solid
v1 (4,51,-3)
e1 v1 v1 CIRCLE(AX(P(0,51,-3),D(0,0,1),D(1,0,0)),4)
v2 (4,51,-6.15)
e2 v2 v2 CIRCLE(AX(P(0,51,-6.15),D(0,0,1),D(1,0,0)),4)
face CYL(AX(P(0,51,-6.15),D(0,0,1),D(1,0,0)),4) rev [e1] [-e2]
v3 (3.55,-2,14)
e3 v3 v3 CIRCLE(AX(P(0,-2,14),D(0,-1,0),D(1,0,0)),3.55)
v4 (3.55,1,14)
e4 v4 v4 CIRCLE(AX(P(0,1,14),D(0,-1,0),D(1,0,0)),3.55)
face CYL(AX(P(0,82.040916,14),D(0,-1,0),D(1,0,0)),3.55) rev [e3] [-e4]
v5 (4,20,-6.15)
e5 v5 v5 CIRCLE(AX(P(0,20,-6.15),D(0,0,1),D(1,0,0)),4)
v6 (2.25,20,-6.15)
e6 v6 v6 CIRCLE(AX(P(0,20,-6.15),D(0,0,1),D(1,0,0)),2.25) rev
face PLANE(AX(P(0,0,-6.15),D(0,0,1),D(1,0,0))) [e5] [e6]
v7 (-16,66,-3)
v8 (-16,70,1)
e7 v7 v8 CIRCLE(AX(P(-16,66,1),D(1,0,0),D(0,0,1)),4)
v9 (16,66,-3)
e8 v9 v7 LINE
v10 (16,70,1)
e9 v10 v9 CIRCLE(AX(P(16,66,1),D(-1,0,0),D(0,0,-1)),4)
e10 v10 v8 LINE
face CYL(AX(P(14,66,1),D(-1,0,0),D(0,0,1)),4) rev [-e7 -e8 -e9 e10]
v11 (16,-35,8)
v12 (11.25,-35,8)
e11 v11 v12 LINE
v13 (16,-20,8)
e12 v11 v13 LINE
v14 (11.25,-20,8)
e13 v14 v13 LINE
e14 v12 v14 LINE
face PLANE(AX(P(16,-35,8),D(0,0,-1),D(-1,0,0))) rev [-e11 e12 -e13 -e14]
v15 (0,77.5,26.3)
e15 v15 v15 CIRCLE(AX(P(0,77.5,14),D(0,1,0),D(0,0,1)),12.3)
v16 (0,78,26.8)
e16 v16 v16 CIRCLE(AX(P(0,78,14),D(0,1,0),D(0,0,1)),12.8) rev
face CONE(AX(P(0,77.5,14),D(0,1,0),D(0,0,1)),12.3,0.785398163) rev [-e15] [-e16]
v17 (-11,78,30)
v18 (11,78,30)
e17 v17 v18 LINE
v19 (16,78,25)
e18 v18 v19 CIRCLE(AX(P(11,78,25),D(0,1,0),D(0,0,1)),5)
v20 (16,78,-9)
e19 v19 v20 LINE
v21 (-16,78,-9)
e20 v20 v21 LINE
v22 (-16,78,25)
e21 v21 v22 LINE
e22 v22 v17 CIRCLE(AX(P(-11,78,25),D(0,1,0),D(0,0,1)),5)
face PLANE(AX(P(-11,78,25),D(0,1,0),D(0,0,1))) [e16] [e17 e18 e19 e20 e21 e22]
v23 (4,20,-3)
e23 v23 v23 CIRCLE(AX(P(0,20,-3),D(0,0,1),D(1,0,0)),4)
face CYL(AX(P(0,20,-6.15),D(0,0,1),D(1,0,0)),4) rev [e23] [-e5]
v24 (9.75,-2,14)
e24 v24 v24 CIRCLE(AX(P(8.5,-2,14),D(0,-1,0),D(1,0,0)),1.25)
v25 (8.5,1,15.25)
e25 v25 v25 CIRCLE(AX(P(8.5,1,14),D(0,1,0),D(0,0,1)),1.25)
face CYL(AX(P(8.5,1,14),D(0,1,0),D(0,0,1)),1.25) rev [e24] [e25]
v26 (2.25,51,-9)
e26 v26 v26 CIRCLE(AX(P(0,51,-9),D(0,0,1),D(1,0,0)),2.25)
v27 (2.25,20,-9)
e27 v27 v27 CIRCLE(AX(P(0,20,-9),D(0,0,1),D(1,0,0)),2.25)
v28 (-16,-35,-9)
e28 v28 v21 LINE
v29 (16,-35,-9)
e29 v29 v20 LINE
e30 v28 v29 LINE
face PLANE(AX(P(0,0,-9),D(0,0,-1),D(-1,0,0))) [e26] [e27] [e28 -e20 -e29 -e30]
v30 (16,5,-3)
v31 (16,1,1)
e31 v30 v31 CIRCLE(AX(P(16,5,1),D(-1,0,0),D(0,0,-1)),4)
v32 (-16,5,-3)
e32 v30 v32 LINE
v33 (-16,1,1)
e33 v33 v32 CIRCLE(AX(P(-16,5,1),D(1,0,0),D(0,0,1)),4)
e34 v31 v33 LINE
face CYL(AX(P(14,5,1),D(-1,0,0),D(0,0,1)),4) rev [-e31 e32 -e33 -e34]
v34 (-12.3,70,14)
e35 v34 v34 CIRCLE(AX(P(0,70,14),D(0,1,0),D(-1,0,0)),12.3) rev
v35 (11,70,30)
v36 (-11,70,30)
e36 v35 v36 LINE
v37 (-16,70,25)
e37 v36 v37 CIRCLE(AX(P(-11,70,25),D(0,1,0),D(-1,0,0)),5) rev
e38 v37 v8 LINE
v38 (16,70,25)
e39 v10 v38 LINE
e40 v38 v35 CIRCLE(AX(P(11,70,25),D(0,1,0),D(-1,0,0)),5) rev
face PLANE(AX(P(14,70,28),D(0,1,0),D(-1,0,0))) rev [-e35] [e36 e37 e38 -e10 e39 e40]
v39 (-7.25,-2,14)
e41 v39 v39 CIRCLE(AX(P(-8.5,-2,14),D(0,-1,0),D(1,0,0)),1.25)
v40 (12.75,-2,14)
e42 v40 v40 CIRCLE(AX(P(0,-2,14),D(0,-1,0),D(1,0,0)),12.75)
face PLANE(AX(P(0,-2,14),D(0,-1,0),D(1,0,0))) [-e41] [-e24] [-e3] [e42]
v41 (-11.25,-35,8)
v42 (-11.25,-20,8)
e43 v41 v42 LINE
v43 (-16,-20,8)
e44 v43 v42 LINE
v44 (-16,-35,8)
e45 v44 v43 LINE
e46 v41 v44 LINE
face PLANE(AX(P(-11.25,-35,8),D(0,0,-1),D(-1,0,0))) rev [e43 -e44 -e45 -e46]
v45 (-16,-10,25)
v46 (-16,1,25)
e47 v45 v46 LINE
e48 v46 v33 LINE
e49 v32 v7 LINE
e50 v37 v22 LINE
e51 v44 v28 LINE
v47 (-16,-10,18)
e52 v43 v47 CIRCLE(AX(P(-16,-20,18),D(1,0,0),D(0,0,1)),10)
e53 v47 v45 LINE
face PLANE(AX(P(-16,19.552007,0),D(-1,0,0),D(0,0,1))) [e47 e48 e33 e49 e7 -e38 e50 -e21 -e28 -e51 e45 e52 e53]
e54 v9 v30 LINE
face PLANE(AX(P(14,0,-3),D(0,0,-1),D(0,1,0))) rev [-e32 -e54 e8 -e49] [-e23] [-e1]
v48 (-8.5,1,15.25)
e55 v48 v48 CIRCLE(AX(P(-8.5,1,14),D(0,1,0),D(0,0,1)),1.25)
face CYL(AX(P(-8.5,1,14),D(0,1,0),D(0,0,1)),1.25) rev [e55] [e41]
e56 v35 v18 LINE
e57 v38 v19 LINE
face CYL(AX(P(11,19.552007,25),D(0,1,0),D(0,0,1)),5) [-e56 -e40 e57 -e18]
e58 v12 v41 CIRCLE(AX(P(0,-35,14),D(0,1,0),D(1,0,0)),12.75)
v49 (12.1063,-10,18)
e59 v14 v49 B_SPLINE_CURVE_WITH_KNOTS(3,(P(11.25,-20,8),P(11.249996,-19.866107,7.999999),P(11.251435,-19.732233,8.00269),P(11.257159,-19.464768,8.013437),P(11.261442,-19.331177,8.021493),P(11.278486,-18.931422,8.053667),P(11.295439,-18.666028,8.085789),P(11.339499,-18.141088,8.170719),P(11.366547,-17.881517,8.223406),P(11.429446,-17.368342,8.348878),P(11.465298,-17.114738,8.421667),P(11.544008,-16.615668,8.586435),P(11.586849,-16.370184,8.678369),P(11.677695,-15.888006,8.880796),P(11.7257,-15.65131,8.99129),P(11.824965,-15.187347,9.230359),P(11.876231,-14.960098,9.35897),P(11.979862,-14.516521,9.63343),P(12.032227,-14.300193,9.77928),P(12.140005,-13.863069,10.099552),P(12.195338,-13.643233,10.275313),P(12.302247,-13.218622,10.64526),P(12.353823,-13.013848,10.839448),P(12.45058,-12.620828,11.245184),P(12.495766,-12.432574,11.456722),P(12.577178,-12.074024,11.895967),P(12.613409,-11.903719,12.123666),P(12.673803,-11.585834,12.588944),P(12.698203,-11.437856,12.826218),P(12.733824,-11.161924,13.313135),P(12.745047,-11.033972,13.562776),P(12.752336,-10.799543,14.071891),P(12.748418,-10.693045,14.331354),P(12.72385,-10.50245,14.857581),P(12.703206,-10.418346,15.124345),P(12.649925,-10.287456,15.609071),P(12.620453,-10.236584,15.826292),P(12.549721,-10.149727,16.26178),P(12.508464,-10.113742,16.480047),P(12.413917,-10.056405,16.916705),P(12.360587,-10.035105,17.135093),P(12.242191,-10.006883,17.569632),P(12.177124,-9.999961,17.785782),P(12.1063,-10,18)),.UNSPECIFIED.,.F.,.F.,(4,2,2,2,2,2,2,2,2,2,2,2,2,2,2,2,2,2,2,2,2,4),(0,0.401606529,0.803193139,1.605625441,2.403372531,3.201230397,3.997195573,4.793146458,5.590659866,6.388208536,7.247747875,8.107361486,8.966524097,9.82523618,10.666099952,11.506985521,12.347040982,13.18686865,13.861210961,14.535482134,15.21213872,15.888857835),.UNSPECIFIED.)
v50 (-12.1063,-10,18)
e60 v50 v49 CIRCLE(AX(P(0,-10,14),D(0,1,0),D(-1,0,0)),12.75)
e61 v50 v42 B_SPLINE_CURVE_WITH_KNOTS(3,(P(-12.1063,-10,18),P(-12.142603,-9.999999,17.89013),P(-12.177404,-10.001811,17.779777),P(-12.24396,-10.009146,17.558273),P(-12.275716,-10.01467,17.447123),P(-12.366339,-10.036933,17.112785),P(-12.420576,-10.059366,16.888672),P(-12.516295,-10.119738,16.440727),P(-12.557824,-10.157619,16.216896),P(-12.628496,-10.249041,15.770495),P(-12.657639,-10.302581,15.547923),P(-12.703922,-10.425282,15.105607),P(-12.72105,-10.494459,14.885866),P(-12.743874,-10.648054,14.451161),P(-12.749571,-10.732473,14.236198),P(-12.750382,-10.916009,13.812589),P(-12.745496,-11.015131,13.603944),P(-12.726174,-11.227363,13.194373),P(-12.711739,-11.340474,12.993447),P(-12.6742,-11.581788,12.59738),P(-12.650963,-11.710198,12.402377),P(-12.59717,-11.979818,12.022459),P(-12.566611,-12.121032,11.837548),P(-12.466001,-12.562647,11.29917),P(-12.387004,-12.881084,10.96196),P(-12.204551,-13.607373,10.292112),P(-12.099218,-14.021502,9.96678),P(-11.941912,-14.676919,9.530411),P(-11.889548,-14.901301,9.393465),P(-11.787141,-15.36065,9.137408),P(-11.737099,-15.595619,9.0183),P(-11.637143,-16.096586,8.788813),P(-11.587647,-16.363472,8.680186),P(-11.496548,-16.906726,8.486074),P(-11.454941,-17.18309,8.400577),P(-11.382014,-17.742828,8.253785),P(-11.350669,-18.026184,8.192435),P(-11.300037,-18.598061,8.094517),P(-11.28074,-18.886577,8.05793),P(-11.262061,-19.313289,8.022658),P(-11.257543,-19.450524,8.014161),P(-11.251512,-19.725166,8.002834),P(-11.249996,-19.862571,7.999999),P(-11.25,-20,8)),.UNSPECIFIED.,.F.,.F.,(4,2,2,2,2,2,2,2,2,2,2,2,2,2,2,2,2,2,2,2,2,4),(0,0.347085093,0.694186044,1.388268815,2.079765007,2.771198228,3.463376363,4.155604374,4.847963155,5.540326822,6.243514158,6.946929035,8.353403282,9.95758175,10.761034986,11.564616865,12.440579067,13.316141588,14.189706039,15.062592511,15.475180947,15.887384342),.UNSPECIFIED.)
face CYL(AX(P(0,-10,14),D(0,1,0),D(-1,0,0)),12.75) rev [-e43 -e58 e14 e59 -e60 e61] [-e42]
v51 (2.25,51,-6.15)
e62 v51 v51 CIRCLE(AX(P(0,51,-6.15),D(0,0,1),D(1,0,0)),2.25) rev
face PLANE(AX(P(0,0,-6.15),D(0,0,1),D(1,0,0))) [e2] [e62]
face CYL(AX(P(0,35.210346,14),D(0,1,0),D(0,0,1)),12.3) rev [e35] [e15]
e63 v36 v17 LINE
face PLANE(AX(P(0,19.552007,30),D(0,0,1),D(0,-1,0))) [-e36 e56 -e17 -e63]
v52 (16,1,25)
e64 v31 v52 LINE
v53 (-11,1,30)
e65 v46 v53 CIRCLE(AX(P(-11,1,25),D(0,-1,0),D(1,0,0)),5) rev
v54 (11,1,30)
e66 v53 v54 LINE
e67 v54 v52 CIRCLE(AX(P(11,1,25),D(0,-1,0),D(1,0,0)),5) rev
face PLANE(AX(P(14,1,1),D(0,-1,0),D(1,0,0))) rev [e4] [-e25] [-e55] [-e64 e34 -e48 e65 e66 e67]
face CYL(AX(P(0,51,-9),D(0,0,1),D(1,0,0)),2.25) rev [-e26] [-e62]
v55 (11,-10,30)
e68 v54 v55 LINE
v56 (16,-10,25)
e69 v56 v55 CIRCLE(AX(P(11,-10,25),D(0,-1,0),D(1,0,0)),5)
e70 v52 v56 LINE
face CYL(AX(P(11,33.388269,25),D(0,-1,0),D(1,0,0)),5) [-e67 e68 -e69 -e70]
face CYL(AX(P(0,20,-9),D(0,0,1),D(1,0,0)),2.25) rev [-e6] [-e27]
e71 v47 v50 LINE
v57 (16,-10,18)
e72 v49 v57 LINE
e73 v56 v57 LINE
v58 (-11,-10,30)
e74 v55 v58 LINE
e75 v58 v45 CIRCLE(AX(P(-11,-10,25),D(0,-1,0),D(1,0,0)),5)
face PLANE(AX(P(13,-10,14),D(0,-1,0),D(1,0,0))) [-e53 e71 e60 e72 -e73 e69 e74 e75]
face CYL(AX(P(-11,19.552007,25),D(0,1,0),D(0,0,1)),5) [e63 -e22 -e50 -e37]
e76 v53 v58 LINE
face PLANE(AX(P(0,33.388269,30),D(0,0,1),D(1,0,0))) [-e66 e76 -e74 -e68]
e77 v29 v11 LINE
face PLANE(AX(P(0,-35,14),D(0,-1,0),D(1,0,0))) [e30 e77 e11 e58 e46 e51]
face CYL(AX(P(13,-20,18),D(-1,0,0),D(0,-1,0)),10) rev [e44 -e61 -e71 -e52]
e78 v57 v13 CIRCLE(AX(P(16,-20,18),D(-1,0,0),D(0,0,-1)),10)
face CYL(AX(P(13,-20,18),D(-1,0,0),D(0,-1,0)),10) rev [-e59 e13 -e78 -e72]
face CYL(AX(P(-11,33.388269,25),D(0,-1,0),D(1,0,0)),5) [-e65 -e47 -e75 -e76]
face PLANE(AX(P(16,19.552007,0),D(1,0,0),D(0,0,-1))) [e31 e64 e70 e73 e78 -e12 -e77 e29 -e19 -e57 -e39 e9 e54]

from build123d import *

# Parameters (mm, degrees)
CROQUIS1_W                          = 31
CROQUIS1_H                          = 72
SALIENTE_EXTRUIR1_DEPTH             = 28
CROQUIS2_W                          = 27
CROQUIS2_H                          = 69
CORTAR_EXTRUIR1_DEPTH               = 83.170554337
CROQUIS5_W                          = 13
CROQUIS5_H                          = 10
DI_METRO_DE_TALADRO_2_5_2_5_2_D     = 2.5
DI_METRO_DE_TALADRO_2_5_2_5_2_DEPTH = 11
REDONDEO3_R                         = 5
REDONDEO4_R                         = 3
SALIENTE_EXTRUIR2_START             = 10
CROQUIS14_R                         = 13
SALIENTE_EXTRUIR2_DEPTH             = 10
CROQUIS15_W                         = 28
CROQUIS15_H                         = 82
SALIENTE_EXTRUIR3_DEPTH             = 6
CORTAR_EXTRUIR2_REACH               = 80.511
CROQUIS16_R                         = 3.55
CROQUIS17_R                         = 3.55
SALIENTE_EXTRUIR4_DEPTH             = 6
CORTAR_EXTRUIR3_DEPTH               = 88.475710915
SALIENTE_EXTRUIR5_START             = 10
SALIENTE_EXTRUIR5_DEPTH             = 10
REDONDEO5_R                         = 10
CROQUIS20_R                         = 2.25
CORTAR_EXTRUIR4_DEPTH               = 86.094065614
CROQUIS21_R                         = 4
CROQUIS21_R_2                       = 2.25
CORTAR_EXTRUIR5_DEPTH               = 3.15
SALIENTE_EXTRUIR6_START             = 2
CROQUIS22_R                         = 12.75
CROQUIS22_R_2                       = 1.25
CROQUIS22_R_3                       = 3.55
SALIENTE_EXTRUIR6_DEPTH             = 2
SALIENTE_EXTRUIR7_START             = -8
SALIENTE_EXTRUIR7_DEPTH             = 8
SALIENTE_EXTRUIR8_DEPTH             = 2
SALIENTE_EXTRUIR9_START             = 2
SALIENTE_EXTRUIR9_DEPTH             = 2
SALIENTE_EXTRUIR10_DEPTH            = 11
CROQUIS27_R                         = 12.3
CORTAR_EXTRUIR6_DEPTH               = 8
SALIENTE_EXTRUIR11_START            = 15
SALIENTE_EXTRUIR11_DEPTH            = 15
CHAFL_N1_SIZE                       = 0.5


with BuildPart() as part:
    # Croquis1 → Saliente-Extruir1 (new body)
    with BuildSketch(Plane(origin=(14, 0, 0), x_dir=(0, 0, -1), z_dir=(1, 0, 0))):
        with Locations((-12.5, 36)):
            Rectangle(CROQUIS1_W, CROQUIS1_H)
    extrude(amount=-SALIENTE_EXTRUIR1_DEPTH)

    # Croquis2 → Cortar-Extruir1 (cut, through all)
    with BuildSketch(Plane.ZY.offset(14)):
        with Locations((14.5, 35.5)):
            Rectangle(CROQUIS2_W, CROQUIS2_H)
    extrude(amount=-CORTAR_EXTRUIR1_DEPTH, mode=Mode.SUBTRACT)

    # Croquis5 → Revolución3 (revolve)
    with BuildSketch(Plane(origin=(0, 0, 14), x_dir=(-1, 0, 0), z_dir=(0, 0, -1)), mode=Mode.PRIVATE) as revoluci_n3_sk:
        with Locations((-6.5, -5)):
            Rectangle(CROQUIS5_W, CROQUIS5_H)
    revolve(revoluci_n3_sk.sketch.rotate(Axis((0, -10, 14), (0, 1, 0)), 180), axis=Axis((0, -10, 14), (0, 1, 0)))

    # Croquis6 → Cortar-Revolución1 (revolve, cut)
    with BuildSketch(Plane(origin=(0, 0, 14), x_dir=(-1, 0, 0), z_dir=(0, 0, -1)), mode=Mode.PRIVATE) as cortar_revoluci_n1_sk:
        Polygon((-12.75, -10), (0, -10), (0, 2), (-2.3, 2), (-2.3, 1), (-2.25, 1), (-2.25, 0), (-12.75, 0), align=None)
    revolve(cortar_revoluci_n1_sk.sketch.rotate(Axis((0, -10, 14), (0, 1, 0)), 180), axis=Axis((0, -10, 14), (0, 1, 0)), mode=Mode.SUBTRACT)

    # Diámetro de taladro Ø2.5 (2.5)2
    with Locations(Plane(origin=(0, 1, 0), x_dir=(1, 0, 0), z_dir=(0, 1, 0))):
        with Locations((8.5, -14), (-8.5, -14)):
            Hole(DI_METRO_DE_TALADRO_2_5_2_5_2_D / 2, depth=DI_METRO_DE_TALADRO_2_5_2_5_2_DEPTH)

    # Redondeo3
    redondeo3_edges = [part.edges().sort_by_distance(p)[0] for p in [
        (0, 1, 1),
        (0, 70, 1),
    ]]
    fillet(redondeo3_edges, radius=REDONDEO3_R)

    # Redondeo4
    redondeo4_edges = [part.edges().sort_by_distance(p)[0] for p in [
        (14, 0.5, 28),
        (-14, 0.5, 28),
        (14, 71, 28),
        (-14, 71, 28),
    ]]
    fillet(redondeo4_edges, radius=REDONDEO4_R)

    # Croquis14 → Saliente-Extruir2 (add)
    with BuildSketch(Plane.XZ.offset(SALIENTE_EXTRUIR2_START)):
        with BuildLine():
            Line((11, 28), (-11, 28))
            ThreePointArc((-11, 28), (-13.121320344, 27.121320344), (-14, 25))
            Line((-14, 25), (-14, -3))
            Line((-14, -3), (14, -3))
            Line((14, -3), (14, 25))
            ThreePointArc((14, 25), (13.121320344, 27.121320344), (11, 28))
        make_face()
        with Locations((0, 14)):
            Circle(CROQUIS14_R, mode=Mode.SUBTRACT)
    extrude(amount=-SALIENTE_EXTRUIR2_DEPTH)

    # Croquis15 → Saliente-Extruir3 (add)
    with BuildSketch(Plane(origin=(0, 0, -3), x_dir=(-1, 0, 0), z_dir=(0, 0, -1))):
        with Locations((0, 31)):
            Rectangle(CROQUIS15_W, CROQUIS15_H)
    extrude(amount=SALIENTE_EXTRUIR3_DEPTH)

    # Cortar-Extruir2: up to this face of the body (flat: up to its plane)
    cortar_extruir2_end = Plane(part.part.faces().sort_by_distance((0, 72, 9.433270582))[0])
    # Croquis16 → Cortar-Extruir2 (cut, up to the picked face)
    with BuildSketch(Plane.XZ, mode=Mode.PRIVATE) as cortar_extruir2_sk1:
        with Locations((0, 14)):
            Circle(CROQUIS16_R)
    cortar_extruir2_tool1 = split(extrude(cortar_extruir2_sk1.sketch, amount=-CORTAR_EXTRUIR2_REACH, mode=Mode.PRIVATE), bisect_by=cortar_extruir2_end, keep=Keep.BOTH, mode=Mode.PRIVATE)
    add(cortar_extruir2_tool1.solids().sort_by(Axis((0, 0, 14), (0, 1, 0)))[0], mode=Mode.SUBTRACT)

    # Croquis17 → Saliente-Extruir4 (add)
    with BuildSketch(Plane(origin=(0, 72, 0), x_dir=(1, 0, 0), z_dir=(0, 1, 0))):
        with BuildLine():
            Line((-11, -28), (11, -28))
            ThreePointArc((11, -28), (13.121320344, -27.121320344), (14, -25))
            Line((14, -25), (14, 9))
            Line((14, 9), (-14, 9))
            Line((-14, 9), (-14, -25))
            ThreePointArc((-14, -25), (-13.121320344, -27.121320344), (-11, -28))
        make_face()
        with Locations((0, -14)):
            Circle(CROQUIS17_R, mode=Mode.SUBTRACT)
    extrude(amount=SALIENTE_EXTRUIR4_DEPTH)

    # Croquis18 → Cortar-Extruir3 (cut, through all)
    with BuildSketch(Plane.ZY.offset(14)):
        with BuildLine():
            Line((6, 70), (1, 70))
            ThreePointArc((1, 70), (-1.828427125, 68.828427125), (-3, 66))
            Line((-3, 66), (-3, 5))
            ThreePointArc((-3, 5), (-1.828427125, 2.171572875), (1, 1))
            Line((1, 1), (6, 1))
            ThreePointArc((6, 1), (2.464466094, 2.464466094), (1, 6))
            Line((1, 6), (1, 65))
            ThreePointArc((1, 65), (2.464466094, 68.535533906), (6, 70))
        make_face()
    extrude(amount=-CORTAR_EXTRUIR3_DEPTH, mode=Mode.SUBTRACT)

    # Croquis19 → Saliente-Extruir5 (add)
    with BuildSketch(Plane.XZ.offset(10).offset(SALIENTE_EXTRUIR5_START)):
        with BuildLine():
            Line((-11.25, 8), (-14, 8))
            Line((-14, 8), (-14, -9))
            Line((-14, -9), (14, -9))
            Line((14, -9), (14, 8))
            Line((14, 8), (11.25, 8))
            ThreePointArc((11.25, 8), (0, 1.25), (-11.25, 8))
        make_face()
    extrude(amount=-SALIENTE_EXTRUIR5_DEPTH)

    # Redondeo5
    # the kernel refuses this fillet: 10 mm, written as the material it adds along each edge
    with BuildSketch(Plane(origin=(14, -10, 8), x_dir=(0, -1, 0), z_dir=(-1, 0, 0))) as redondeo5_piece_1_section:
        with BuildLine():
            CenterArc((REDONDEO5_R, REDONDEO5_R), REDONDEO5_R, 180, 90)
            Line((0, REDONDEO5_R), (0, 0))
            Line((0, 0), (REDONDEO5_R, 0))
        make_face()
    redondeo5_piece_1 = extrude(amount=27.75, mode=Mode.PRIVATE)
    redondeo5_piece_1 = redondeo5_piece_1 - Plane(origin=(0, -12.512239399, 14), x_dir=(-1, 0, 0), z_dir=(0, -1, 0)) * Cylinder(12.75, 96, mode=Mode.PRIVATE)
    add(redondeo5_piece_1)
    with BuildSketch(Plane(origin=(13.75, -10, 8), x_dir=(0, -1, 0), z_dir=(-1, 0, 0))) as redondeo5_piece_2_section:
        with BuildLine():
            CenterArc((REDONDEO5_R, REDONDEO5_R), REDONDEO5_R, 180, 90)
            Line((0, REDONDEO5_R), (0, 0))
            Line((0, 0), (REDONDEO5_R, 0))
        make_face()
    redondeo5_piece_2 = extrude(amount=27.75, mode=Mode.PRIVATE)
    redondeo5_piece_2 = redondeo5_piece_2 - Plane(origin=(0, -12.552647231, 14), x_dir=(-1, 0, 0), z_dir=(0, -1, 0)) * Cylinder(12.75, 96, mode=Mode.PRIVATE)
    add(redondeo5_piece_2)

    # Croquis20 → Cortar-Extruir4 (cut, through all)
    with BuildSketch(Plane.XY.offset(-3)):
        with Locations((0, 51)):
            Circle(CROQUIS20_R)
        with Locations((0, 20)):
            Circle(CROQUIS20_R)
    extrude(amount=-CORTAR_EXTRUIR4_DEPTH, mode=Mode.SUBTRACT)

    # Croquis21 → Cortar-Extruir5 (cut)
    # profile 1 of 2: a face of its own
    with BuildSketch(Plane.XY.offset(-3)):
        with Locations((0, 51)):
            Circle(CROQUIS21_R)
        with Locations((0, 51)):
            Circle(CROQUIS21_R_2, mode=Mode.SUBTRACT)
    # profile 2 of 2: a face of its own
    with BuildSketch(Plane.XY.offset(-3)):
        with Locations((0, 20)):
            Circle(CROQUIS21_R)
        with Locations((0, 20)):
            Circle(CROQUIS21_R_2, mode=Mode.SUBTRACT)
    extrude(amount=-CORTAR_EXTRUIR5_DEPTH, mode=Mode.SUBTRACT)

    # Croquis22 → Saliente-Extruir6 (add)
    with BuildSketch(Plane.XZ.offset(SALIENTE_EXTRUIR6_START)):
        with Locations(Location((0, 14, 0), (0, 0, 161.71611006))):
            Circle(CROQUIS22_R)
        with Locations(Location((8.5, 14, 0), (0, 0, 90))):
            Circle(CROQUIS22_R_2, mode=Mode.SUBTRACT)
        with Locations((0, 14)):
            Circle(CROQUIS22_R_3, mode=Mode.SUBTRACT)
        with Locations(Location((-8.5, 14, 0), (0, 0, 90))):
            Circle(CROQUIS22_R_2, mode=Mode.SUBTRACT)
    extrude(amount=-SALIENTE_EXTRUIR6_DEPTH)

    # Croquis23 → Saliente-Extruir7 (add)
    with BuildSketch(Plane(origin=(0, 78, 0), x_dir=(1, 0, 0), z_dir=(0, 1, 0)).offset(SALIENTE_EXTRUIR7_START)):
        with BuildLine():
            Line((-11, -30), (11, -30))
            ThreePointArc((11, -30), (14.535533906, -28.535533906), (16, -25))
            Line((16, -25), (16, 9))
            Line((16, 9), (14, 9))
            Line((14, 9), (14, -25))
            ThreePointArc((14, -25), (13.121320344, -27.121320344), (11, -28))
            Line((11, -28), (-11, -28))
            ThreePointArc((-11, -28), (-13.121320344, -27.121320344), (-14, -25))
            Line((-14, -25), (-14, 9))
            Line((-14, 9), (-16, 9))
            Line((-16, 9), (-16, -25))
            ThreePointArc((-16, -25), (-14.535533906, -28.535533906), (-11, -30))
        make_face()
    extrude(amount=SALIENTE_EXTRUIR7_DEPTH)

    # Croquis24 → Saliente-Extruir8 (add)
    with BuildSketch(Plane.ZY.offset(14)):
        with BuildLine():
            Line((1, 70), (-9, 70))
            Line((-9, 70), (-9, -20))
            Line((-9, -20), (8, -20))
            ThreePointArc((8, -20), (10.928932188, -12.928932188), (18, -10))
            Line((18, -10), (25, -10))
            Line((25, -10), (25, 1))
            Line((25, 1), (1, 1))
            ThreePointArc((1, 1), (-1.828427125, 2.171572875), (-3, 5))
            Line((-3, 5), (-3, 66))
            ThreePointArc((-3, 66), (-1.828427125, 68.828427125), (1, 70))
        make_face()
    extrude(amount=SALIENTE_EXTRUIR8_DEPTH)

    # Croquis25 → Saliente-Extruir9 (add)
    with BuildSketch(Plane(origin=(14, 0, 0), x_dir=(0, 0, -1), z_dir=(1, 0, 0)).offset(SALIENTE_EXTRUIR9_START)):
        with BuildLine():
            Line((9, -20), (9, 70))
            Line((9, 70), (-1, 70))
            ThreePointArc((-1, 70), (1.828427125, 68.828427125), (3, 66))
            Line((3, 66), (3, 5))
            ThreePointArc((3, 5), (1.828427125, 2.171572875), (-1, 1))
            Line((-1, 1), (-25, 1))
            Line((-25, 1), (-25, -10))
            Line((-25, -10), (-18, -10))
            ThreePointArc((-18, -10), (-10.928932188, -12.928932188), (-8, -20))
            Line((-8, -20), (9, -20))
        make_face()
    extrude(amount=-SALIENTE_EXTRUIR9_DEPTH)

    # Croquis26 → Saliente-Extruir10 (add)
    with BuildSketch(Plane.XZ.offset(10)):
        with BuildLine():
            Line((11, 30), (-11, 30))
            ThreePointArc((-11, 30), (-14.535533906, 28.535533906), (-16, 25))
            Line((-16, 25), (-14, 25))
            ThreePointArc((-14, 25), (-13.121320344, 27.121320344), (-11, 28))
            Line((-11, 28), (11, 28))
            ThreePointArc((11, 28), (13.121320344, 27.121320344), (14, 25))
            Line((14, 25), (16, 25))
            ThreePointArc((16, 25), (14.535533906, 28.535533906), (11, 30))
        make_face()
    extrude(amount=-SALIENTE_EXTRUIR10_DEPTH)

    # Croquis27 → Cortar-Extruir6 (cut)
    with BuildSketch(Plane(origin=(0, 78, 0), x_dir=(1, 0, 0), z_dir=(0, 1, 0))):
        with Locations(Location((0, -14, 0), (0, 0, 270))):
            Circle(CROQUIS27_R)
    extrude(amount=-CORTAR_EXTRUIR6_DEPTH, mode=Mode.SUBTRACT)

    # Croquis28 → Saliente-Extruir11 (add)
    with BuildSketch(Plane.XZ.offset(20).offset(SALIENTE_EXTRUIR11_START)):
        with BuildLine():
            Line((16, 8), (11.25, 8))
            ThreePointArc((11.25, 8), (0, 1.25), (-11.25, 8))
            Line((-11.25, 8), (-16, 8))
            Line((-16, 8), (-16, -9))
            Line((-16, -9), (16, -9))
            Line((16, -9), (16, 8))
        make_face()
    extrude(amount=-SALIENTE_EXTRUIR11_DEPTH)

    # Chaflán1
    chafl_n1_edges = [part.edges().sort_by_distance(p)[0] for p in [
        (0, 78, 1.7),
    ]]
    chamfer(chafl_n1_edges, length=CHAFL_N1_SIZE)


solid = part.part
